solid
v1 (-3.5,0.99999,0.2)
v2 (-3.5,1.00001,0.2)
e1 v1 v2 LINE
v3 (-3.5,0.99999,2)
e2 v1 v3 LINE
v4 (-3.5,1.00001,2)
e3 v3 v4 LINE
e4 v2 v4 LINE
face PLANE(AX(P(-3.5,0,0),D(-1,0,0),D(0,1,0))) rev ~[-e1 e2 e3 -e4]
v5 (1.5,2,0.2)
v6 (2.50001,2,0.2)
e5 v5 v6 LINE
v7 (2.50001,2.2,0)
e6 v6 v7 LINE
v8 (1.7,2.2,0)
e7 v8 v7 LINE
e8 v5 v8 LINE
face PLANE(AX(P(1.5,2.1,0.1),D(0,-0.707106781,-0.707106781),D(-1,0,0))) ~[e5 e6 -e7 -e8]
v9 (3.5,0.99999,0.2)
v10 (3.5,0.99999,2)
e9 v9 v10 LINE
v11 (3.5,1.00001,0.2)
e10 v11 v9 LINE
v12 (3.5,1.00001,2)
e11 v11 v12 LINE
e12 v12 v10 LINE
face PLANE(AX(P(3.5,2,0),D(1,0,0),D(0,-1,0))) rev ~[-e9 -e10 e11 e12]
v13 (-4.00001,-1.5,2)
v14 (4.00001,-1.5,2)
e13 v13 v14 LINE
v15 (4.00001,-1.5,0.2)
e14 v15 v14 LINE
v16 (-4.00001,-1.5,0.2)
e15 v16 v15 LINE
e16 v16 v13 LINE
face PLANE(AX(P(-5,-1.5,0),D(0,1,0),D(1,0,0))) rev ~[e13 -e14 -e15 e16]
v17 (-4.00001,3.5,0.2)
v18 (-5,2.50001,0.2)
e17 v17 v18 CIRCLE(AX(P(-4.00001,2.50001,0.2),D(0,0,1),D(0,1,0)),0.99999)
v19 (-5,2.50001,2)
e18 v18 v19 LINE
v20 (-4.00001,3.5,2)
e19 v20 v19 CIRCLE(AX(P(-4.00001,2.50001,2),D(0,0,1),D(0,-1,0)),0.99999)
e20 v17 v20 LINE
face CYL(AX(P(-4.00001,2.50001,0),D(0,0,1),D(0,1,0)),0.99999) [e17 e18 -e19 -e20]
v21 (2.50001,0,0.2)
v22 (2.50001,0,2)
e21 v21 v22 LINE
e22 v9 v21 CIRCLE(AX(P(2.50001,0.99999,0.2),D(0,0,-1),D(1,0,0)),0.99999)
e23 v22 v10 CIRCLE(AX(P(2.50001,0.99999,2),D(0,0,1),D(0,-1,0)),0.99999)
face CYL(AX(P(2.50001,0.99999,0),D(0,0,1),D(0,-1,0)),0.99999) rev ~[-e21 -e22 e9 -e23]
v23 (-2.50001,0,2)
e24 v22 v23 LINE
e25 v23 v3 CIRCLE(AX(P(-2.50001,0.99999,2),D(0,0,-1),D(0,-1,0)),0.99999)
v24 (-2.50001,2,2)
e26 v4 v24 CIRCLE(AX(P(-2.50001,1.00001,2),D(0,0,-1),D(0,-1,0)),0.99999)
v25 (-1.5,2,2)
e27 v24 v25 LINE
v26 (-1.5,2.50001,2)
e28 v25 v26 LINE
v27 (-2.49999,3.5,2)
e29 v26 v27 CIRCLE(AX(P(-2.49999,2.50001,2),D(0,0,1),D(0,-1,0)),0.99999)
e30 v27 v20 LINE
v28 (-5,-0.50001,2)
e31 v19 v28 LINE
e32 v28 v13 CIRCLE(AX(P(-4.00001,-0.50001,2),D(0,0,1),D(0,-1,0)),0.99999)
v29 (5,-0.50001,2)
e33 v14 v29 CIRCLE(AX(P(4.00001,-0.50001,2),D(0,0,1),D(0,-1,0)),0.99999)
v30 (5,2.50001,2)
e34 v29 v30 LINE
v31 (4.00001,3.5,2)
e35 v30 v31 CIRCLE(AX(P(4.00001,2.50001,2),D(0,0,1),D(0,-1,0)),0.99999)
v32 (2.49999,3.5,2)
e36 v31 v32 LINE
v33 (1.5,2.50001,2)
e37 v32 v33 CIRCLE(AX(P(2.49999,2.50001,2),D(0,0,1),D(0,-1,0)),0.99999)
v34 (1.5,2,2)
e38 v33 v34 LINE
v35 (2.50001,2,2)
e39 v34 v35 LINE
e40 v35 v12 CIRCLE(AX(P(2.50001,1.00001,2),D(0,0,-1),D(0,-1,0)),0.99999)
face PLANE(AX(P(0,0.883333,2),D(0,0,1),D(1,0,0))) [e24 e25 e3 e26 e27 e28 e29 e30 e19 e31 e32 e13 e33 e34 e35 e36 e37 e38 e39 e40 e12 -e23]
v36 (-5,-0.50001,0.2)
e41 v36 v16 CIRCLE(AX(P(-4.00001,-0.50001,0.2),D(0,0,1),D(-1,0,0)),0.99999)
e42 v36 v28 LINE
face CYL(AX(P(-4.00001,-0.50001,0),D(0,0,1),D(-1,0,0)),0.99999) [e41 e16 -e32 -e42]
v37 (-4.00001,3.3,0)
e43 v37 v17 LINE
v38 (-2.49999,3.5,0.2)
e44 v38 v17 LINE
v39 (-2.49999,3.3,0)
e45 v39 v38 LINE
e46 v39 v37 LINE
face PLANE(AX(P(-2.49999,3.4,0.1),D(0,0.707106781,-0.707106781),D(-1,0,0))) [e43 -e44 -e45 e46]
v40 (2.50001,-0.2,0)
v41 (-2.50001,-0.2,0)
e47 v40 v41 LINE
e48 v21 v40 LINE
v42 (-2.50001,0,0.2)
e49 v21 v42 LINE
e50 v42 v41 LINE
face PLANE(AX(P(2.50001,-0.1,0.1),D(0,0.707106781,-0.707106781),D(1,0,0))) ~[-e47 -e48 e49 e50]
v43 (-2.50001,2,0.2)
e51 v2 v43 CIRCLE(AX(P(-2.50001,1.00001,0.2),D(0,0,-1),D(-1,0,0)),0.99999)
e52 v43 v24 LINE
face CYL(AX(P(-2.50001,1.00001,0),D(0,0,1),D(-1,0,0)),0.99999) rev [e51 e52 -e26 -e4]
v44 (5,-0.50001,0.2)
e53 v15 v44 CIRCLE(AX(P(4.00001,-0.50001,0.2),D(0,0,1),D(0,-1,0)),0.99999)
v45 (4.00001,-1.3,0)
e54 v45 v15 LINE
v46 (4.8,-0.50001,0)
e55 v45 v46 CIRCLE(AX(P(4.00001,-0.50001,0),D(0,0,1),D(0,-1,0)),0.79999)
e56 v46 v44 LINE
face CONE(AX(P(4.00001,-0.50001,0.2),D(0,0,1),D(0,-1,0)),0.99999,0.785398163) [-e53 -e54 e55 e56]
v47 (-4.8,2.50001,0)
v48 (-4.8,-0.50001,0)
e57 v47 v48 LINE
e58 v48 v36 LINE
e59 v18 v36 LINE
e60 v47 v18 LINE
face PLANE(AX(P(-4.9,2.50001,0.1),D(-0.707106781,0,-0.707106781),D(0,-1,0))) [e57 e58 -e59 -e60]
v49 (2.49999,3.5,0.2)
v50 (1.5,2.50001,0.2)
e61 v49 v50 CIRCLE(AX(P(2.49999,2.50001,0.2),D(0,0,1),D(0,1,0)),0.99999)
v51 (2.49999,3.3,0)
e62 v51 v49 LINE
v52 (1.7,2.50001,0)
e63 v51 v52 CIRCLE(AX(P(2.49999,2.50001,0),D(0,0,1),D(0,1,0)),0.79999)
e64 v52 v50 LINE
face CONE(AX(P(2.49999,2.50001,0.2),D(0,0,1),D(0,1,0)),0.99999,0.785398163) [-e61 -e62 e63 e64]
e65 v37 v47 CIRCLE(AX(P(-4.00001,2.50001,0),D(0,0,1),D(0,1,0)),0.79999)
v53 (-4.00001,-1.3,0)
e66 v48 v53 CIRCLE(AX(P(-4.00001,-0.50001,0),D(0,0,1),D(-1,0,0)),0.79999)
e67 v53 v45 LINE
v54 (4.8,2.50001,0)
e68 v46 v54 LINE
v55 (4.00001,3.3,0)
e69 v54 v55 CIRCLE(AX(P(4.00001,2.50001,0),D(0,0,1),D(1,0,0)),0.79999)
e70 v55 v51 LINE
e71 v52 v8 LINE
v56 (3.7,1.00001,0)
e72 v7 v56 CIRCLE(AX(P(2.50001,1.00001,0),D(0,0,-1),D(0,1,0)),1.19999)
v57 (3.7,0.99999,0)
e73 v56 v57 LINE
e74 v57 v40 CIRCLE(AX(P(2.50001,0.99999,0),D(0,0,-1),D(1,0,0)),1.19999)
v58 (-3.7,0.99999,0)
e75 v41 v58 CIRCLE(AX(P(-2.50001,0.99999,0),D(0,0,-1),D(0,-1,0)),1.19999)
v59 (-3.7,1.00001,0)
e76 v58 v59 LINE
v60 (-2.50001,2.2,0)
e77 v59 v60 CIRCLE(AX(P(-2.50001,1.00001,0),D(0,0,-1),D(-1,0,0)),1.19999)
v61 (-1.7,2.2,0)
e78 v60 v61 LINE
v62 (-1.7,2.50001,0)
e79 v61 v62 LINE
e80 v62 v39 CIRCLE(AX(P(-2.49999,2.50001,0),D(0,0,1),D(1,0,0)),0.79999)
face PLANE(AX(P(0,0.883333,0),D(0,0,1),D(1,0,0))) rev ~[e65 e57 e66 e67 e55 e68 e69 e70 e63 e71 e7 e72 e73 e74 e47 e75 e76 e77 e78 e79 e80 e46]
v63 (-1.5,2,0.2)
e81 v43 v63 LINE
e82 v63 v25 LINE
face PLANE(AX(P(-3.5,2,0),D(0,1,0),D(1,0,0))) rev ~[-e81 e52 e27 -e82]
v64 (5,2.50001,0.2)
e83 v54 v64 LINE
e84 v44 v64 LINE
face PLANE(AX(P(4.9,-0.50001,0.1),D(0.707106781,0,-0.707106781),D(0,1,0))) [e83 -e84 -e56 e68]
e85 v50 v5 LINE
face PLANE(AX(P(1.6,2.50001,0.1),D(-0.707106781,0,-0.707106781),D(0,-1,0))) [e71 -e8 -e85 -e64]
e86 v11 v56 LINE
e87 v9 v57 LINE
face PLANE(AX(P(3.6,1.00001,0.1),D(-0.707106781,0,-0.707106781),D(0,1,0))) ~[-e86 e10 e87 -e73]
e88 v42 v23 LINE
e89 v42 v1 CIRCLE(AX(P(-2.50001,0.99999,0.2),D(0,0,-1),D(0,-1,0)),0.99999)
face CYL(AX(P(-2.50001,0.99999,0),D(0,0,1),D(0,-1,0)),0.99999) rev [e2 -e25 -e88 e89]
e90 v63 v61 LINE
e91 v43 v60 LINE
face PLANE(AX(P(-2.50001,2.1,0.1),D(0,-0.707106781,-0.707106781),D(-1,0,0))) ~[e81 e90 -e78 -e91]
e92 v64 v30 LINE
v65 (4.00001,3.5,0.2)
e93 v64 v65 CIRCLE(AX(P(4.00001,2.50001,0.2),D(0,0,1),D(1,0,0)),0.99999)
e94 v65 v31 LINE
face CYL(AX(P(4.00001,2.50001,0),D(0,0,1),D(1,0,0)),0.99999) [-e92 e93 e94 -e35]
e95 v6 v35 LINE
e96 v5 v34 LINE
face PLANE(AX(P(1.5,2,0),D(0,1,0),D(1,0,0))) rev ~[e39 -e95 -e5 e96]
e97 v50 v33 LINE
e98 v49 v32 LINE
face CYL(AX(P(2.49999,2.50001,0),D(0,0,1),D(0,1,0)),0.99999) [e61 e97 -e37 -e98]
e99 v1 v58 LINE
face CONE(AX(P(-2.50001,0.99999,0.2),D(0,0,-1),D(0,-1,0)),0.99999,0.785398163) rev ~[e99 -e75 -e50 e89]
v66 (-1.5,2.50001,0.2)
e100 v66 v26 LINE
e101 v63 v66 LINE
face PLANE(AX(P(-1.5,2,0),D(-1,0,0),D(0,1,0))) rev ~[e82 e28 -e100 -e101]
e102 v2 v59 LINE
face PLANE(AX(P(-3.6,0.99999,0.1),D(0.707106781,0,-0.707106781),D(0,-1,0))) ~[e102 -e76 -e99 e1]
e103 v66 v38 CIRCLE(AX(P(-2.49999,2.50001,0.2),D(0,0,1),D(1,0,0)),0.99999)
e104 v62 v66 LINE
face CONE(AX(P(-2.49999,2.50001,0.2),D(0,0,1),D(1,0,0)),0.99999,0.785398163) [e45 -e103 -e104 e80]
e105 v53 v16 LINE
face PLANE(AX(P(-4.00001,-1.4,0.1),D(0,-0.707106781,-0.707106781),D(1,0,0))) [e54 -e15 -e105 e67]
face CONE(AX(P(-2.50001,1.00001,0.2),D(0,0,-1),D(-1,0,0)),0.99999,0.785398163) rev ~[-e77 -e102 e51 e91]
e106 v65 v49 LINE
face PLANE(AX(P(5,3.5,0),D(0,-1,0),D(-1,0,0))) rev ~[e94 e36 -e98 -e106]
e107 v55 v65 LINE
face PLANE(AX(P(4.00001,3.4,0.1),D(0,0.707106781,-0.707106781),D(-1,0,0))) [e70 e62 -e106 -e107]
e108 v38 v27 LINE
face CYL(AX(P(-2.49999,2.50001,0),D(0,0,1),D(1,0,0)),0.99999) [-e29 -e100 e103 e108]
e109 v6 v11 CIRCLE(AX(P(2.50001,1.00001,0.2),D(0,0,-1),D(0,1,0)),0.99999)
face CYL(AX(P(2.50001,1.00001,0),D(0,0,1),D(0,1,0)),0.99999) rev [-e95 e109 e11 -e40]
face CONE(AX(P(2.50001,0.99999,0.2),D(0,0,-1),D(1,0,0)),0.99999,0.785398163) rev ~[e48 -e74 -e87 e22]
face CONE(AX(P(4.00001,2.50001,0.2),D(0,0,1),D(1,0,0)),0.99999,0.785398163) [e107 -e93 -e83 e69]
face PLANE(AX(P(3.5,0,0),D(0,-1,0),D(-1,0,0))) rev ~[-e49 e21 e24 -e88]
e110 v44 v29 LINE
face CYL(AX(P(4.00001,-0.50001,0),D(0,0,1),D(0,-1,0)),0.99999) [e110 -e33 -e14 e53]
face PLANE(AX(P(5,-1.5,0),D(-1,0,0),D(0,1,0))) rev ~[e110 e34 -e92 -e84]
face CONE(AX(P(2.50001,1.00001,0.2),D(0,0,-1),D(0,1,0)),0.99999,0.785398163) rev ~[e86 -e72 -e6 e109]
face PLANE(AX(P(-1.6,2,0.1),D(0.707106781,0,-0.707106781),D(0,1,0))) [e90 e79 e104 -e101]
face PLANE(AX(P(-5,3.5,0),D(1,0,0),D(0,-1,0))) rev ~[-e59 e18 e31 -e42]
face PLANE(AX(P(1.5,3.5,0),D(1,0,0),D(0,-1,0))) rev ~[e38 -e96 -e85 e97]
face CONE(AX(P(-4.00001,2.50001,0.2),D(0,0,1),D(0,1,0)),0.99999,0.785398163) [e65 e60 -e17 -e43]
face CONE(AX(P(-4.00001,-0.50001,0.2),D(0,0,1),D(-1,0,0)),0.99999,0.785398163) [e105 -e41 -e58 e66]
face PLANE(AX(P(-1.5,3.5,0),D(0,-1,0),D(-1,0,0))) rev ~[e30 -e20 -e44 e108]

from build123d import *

# Parameters (mm, degrees)
F1_DEPTH = 2
F2_R     = 0.99999
F3_SIZE  = 0.2


# Not quite as in the source:
# - a fillet or chamfer is up to 0.001 mm smaller than in the source, because OpenCascade refuses the exact size


with BuildPart() as f1:
    # F0 (on Top) → F1 (new body)
    with BuildSketch(Plane.XY):
        Polygon((3.5, 0), (0, 0), (-3.5, 0), (-3.5, 2), (-1.5, 2), (-1.5, 3.5), (-5, 3.5), (-5, -1.5), (0, -1.5), (5, -1.5), (5, 3.5), (1.5, 3.5), (1.5, 2), (3.5, 2), align=None)
    extrude(amount=F1_DEPTH)

    # F2 (radius 1 in the source; OpenCascade refuses exactly that, so slightly less here)
    f2_edges = [f1.edges().sort_by_distance(p)[0] for p in [
        (-1.5, 3.5, 1),
        (1.5, 3.5, 1),
        (5, 3.5, 1),
        (5, -1.5, 1),
        (-5, -1.5, 1),
        (-5, 3.5, 1),
        (-3.5, 2, 1),
        (-3.5, 0, 1),
        (3.5, 2, 1),
        (3.5, 0, 1),
    ]]
    fillet(f2_edges, radius=F2_R)

    # F3
    f3_edges = [f1.edges().sort_by_distance(p)[0] for p in [
        (0, 0, 0),
        (3.20711, 0.29289, 0),
        (-3.20711, 0.29289, 0),
        (3.5, 1, 0),
        (-3.5, 1, 0),
        (3.20711, 1.70711, 0),
        (-3.20711, 1.70711, 0),
        (2.000005, 2, 0),
        (-2.000005, 2, 0),
        (1.5, 2.250005, 0),
        (-1.5, 2.250005, 0),
        (1.79289, 3.20711, 0),
        (-1.79289, 3.20711, 0),
        (3.25, 3.5, 0),
        (-3.25, 3.5, 0),
        (4.70711, 3.20711, 0),
        (-4.70711, 3.20711, 0),
        (5, 1, 0),
        (-5, 1, 0),
        (4.70711, -1.20711, 0),
        (-4.70711, -1.20711, 0),
        (0, -1.5, 0),
    ]]
    chamfer(f3_edges, length=F3_SIZE)


solid = f1.part
